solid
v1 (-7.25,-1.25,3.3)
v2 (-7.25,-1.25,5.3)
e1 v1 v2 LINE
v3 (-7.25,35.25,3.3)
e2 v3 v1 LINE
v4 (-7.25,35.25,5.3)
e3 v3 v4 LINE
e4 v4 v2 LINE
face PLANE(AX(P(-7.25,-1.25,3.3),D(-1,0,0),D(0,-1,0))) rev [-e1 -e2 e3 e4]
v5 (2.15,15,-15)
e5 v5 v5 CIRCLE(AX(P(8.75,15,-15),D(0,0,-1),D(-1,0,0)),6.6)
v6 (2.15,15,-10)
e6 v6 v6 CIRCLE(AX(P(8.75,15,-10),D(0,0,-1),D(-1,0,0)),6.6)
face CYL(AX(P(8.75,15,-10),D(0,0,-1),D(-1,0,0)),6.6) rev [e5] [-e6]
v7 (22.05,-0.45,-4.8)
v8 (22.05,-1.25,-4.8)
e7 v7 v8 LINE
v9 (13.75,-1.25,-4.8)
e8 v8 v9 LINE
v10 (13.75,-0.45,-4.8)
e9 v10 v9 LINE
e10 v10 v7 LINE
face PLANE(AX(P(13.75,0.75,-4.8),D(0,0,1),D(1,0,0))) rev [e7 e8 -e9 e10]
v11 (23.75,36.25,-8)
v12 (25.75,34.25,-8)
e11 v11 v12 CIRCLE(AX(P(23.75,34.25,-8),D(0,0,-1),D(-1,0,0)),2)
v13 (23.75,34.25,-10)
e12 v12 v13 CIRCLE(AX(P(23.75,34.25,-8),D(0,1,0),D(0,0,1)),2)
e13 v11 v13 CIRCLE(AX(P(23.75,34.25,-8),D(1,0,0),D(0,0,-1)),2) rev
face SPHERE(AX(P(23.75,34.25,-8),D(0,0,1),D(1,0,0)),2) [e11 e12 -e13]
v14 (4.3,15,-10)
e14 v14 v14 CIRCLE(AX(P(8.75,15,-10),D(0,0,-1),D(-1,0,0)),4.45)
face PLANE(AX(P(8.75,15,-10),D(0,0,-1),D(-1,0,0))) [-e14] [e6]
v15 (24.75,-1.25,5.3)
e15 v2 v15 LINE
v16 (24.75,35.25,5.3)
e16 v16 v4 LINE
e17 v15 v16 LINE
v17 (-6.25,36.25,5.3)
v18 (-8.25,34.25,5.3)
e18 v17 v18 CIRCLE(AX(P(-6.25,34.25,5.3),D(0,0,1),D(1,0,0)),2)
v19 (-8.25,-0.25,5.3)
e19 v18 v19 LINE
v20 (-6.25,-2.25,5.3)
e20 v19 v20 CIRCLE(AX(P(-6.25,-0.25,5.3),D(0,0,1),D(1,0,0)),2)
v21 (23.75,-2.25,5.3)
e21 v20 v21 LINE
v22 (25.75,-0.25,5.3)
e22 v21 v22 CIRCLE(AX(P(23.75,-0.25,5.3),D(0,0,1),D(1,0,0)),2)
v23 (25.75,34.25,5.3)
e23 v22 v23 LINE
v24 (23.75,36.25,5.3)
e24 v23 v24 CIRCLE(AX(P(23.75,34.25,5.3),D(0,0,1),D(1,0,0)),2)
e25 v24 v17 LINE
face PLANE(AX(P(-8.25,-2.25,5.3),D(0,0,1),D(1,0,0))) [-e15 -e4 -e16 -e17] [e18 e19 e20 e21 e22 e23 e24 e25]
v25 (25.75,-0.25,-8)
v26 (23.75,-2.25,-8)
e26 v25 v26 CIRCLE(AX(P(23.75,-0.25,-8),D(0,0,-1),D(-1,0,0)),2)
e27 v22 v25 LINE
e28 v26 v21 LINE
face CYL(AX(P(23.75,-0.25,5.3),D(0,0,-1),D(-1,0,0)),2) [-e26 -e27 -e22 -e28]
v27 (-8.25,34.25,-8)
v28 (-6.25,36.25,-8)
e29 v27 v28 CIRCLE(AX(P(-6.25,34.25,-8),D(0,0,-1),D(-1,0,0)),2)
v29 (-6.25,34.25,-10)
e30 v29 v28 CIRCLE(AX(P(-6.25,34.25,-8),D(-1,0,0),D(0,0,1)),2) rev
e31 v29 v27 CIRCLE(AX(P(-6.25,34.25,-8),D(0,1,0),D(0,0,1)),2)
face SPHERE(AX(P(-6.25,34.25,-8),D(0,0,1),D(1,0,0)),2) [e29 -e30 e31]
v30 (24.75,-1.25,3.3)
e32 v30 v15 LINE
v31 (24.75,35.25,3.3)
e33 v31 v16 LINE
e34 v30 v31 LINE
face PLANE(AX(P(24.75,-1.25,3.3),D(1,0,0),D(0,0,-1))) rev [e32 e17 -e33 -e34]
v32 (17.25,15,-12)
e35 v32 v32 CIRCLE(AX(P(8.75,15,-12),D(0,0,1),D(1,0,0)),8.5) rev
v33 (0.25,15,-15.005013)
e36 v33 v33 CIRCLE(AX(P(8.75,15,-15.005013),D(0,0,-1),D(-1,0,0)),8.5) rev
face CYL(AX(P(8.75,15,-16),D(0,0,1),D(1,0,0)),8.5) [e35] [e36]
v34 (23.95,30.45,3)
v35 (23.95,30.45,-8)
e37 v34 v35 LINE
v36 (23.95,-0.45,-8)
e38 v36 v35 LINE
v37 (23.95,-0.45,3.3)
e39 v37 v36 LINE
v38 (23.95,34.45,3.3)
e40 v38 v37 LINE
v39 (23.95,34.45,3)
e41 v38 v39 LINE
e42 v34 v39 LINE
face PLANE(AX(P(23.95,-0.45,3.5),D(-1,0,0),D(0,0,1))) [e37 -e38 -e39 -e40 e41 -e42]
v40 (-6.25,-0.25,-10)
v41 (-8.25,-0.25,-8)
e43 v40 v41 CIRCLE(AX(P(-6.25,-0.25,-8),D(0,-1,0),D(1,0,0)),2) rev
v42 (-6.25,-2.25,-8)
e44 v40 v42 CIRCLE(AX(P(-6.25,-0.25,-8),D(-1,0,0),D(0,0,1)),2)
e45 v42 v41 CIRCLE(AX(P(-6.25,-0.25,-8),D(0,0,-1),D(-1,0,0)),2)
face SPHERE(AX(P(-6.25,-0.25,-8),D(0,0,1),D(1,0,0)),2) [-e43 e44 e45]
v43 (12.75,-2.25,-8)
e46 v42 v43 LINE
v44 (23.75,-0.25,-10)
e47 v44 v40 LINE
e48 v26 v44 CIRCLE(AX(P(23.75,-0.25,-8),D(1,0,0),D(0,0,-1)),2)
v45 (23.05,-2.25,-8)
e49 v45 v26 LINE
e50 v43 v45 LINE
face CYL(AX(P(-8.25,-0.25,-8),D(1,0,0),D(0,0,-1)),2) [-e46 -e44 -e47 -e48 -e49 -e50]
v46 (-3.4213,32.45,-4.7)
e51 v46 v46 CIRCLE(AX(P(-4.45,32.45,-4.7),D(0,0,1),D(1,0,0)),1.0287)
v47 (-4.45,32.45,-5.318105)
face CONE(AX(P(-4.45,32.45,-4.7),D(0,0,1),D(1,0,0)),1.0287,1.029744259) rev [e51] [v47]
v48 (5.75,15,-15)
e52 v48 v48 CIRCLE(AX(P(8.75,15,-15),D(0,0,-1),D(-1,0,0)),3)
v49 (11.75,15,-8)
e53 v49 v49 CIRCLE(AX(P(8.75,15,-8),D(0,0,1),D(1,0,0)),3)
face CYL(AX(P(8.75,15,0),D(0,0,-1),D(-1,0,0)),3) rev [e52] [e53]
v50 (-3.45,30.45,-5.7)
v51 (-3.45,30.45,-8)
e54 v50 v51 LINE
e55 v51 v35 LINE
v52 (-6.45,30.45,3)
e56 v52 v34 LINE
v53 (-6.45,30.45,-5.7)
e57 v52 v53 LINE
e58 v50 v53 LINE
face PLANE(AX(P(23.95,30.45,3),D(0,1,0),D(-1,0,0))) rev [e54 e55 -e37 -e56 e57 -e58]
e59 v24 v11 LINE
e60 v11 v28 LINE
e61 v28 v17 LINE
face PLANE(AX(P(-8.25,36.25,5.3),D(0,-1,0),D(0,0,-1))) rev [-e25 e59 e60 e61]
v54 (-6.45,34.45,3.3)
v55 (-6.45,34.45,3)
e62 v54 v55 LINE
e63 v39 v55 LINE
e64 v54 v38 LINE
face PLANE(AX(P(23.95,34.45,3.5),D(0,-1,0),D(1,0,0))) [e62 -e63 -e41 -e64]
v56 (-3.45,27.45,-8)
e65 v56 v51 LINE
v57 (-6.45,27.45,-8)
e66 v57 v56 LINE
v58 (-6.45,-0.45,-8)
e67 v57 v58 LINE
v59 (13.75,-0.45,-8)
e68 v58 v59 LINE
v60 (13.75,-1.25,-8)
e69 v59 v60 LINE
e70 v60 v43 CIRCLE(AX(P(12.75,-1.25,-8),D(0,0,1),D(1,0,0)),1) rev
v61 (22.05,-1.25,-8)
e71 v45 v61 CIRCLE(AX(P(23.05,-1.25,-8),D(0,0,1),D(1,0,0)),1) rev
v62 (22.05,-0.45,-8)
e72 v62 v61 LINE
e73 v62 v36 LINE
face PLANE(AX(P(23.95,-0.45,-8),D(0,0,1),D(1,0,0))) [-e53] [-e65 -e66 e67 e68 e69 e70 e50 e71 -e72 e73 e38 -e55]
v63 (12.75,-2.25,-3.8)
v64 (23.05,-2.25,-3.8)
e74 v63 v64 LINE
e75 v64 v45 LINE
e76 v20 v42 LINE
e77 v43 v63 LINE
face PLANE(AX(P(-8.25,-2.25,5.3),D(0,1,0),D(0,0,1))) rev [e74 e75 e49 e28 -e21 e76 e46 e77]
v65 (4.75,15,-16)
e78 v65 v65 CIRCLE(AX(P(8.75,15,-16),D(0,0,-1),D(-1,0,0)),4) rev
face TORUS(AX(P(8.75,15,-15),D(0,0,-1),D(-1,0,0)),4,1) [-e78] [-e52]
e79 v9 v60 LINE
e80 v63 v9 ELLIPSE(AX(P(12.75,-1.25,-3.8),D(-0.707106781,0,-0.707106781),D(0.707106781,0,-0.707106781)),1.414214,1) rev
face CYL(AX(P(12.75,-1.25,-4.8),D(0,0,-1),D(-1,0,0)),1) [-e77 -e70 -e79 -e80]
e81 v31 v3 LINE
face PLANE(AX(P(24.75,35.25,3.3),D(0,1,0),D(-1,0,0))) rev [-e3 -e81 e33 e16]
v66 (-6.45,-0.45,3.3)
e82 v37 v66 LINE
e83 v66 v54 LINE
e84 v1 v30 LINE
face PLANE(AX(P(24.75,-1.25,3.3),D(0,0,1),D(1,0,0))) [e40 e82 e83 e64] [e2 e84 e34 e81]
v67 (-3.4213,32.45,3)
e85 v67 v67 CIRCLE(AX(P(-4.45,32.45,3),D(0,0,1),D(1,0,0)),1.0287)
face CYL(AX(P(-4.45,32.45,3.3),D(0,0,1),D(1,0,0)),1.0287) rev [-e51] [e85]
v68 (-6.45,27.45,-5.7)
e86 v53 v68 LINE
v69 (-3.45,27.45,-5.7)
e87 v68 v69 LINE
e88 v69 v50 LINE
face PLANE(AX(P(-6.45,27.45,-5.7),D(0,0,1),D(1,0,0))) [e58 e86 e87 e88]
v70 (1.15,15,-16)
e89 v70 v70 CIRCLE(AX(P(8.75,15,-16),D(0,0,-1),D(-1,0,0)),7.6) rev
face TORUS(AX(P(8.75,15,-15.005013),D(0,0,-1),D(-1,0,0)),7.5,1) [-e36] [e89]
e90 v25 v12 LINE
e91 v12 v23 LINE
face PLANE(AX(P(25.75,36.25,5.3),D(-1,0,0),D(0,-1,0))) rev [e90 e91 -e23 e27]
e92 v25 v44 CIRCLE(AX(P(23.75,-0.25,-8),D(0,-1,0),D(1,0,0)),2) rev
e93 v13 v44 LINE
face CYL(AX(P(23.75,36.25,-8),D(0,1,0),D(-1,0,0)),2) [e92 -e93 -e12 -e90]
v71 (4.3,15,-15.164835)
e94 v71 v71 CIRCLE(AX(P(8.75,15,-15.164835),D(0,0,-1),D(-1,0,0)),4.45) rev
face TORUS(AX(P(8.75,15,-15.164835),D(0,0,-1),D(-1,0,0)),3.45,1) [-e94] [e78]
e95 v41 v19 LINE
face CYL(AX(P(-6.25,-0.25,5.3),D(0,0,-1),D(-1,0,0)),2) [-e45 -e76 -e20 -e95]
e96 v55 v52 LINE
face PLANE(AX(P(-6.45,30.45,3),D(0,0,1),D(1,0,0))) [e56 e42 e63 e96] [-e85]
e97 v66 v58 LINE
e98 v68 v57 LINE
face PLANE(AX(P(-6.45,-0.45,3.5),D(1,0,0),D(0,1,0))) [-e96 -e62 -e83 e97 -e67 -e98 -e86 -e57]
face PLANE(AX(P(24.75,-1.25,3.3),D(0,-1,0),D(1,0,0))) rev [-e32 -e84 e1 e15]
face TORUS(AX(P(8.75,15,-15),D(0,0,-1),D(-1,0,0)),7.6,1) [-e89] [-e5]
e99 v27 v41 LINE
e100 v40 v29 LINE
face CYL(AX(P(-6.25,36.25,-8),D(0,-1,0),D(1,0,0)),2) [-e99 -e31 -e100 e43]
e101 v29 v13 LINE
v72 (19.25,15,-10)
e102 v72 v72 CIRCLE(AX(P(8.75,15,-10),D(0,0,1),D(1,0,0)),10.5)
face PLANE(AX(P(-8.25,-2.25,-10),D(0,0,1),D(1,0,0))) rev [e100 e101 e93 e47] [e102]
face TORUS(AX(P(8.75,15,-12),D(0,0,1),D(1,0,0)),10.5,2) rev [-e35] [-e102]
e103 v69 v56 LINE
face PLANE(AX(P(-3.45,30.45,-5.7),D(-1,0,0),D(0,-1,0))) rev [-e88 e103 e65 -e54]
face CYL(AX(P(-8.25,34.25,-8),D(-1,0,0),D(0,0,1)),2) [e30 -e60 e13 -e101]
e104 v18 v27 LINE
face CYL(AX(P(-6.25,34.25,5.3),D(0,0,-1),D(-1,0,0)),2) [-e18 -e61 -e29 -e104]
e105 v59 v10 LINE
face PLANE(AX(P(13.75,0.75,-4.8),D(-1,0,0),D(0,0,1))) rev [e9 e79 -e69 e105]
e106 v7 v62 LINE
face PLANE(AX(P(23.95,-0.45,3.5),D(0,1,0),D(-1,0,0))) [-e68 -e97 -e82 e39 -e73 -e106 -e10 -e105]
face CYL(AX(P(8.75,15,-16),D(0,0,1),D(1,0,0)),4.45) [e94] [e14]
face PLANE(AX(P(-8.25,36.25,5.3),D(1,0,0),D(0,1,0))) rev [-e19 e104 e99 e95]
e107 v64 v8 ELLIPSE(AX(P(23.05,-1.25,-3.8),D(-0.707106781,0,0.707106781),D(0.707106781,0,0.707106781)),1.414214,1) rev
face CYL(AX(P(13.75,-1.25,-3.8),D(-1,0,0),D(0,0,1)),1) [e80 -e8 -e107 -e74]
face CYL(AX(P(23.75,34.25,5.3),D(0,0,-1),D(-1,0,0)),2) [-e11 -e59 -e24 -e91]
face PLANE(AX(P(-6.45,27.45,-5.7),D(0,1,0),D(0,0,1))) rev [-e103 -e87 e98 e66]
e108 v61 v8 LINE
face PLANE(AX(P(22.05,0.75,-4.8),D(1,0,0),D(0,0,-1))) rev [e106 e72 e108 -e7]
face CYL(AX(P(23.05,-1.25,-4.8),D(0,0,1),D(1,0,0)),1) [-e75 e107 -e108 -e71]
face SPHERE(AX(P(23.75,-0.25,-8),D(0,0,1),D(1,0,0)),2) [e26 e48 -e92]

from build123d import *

# Parameters (mm, degrees)
EXTRUDE1_DEPTH            = 5.3
EXTRUDE1_DEPTH_BACK       = 10
SKETCH1_W                 = 34
SKETCH1_H                 = 38.5
SKETCH5_W                 = 32
SKETCH5_H                 = 36.5
CUT_EXTRUDE2_DEPTH        = 2
CUT_EXTRUDE3_DEPTH        = 0.2
CUT_EXTRUDE3_DEPTH_BACK   = 11.3
SKETCH6_W                 = 30.4
SKETCH6_H                 = 34.9
FILLET1_R                 = 2
SKETCH11_W                = 30.4
SKETCH11_H                = 4
EXTRUDE4_DEPTH            = 11
F_1_CLEARANCE_HOLE1_D     = 2.0574
F_1_CLEARANCE_HOLE1_DEPTH = 8
F_1_CLEARANCE_HOLE1_TIP   = 0.618105319
SKETCH17_R                = 3
CUT_EXTRUDE6_DEPTH        = 10
SKETCH18_W                = 3
SKETCH18_H                = 3
EXTRUDE5_DEPTH            = 2.3
SKETCH19_W                = 8.3
SKETCH19_H                = 3.2
CUT_EXTRUDE7_DEPTH        = 3
SKETCH20_R                = 8.5
EXTRUDE6_DEPTH            = 6
SKETCH21_R                = 6.6
CUT_EXTRUDE8_DEPTH        = 6
SKETCH22_R                = 4.45
EXTRUDE7_DEPTH            = 6
SKETCH23_R                = 3
CUT_EXTRUDE9_DEPTH        = 6
FILLET2_R                 = 1
FILLET3_R                 = 1
FILLET4_R                 = 1
FILLET5_R                 = 1
FILLET6_R                 = 2
FILLET7_R                 = 1


with BuildPart() as part:
    # Sketch1 → Extrude1 (new, two sides: drawn at the far end of the back side and taken through both)
    with BuildSketch(Plane.XY.offset(-EXTRUDE1_DEPTH_BACK)):
        with Locations((8.75, 17)):
            Rectangle(SKETCH1_W, SKETCH1_H)
    extrude(amount=EXTRUDE1_DEPTH + EXTRUDE1_DEPTH_BACK)

    # Sketch5 → Cut-Extrude2 (cut)
    with BuildSketch(Plane.XY.offset(5.3)):
        with Locations((8.75, 17)):
            Rectangle(SKETCH5_W, SKETCH5_H)
    extrude(amount=-CUT_EXTRUDE2_DEPTH, mode=Mode.SUBTRACT)

    # Sketch6 → Cut-Extrude3 (cut, two sides: drawn at the far end of the back side and taken through both)
    with BuildSketch(Plane.XY.offset(3.3).offset(-CUT_EXTRUDE3_DEPTH_BACK)):
        with Locations((8.75, 17)):
            Rectangle(SKETCH6_W, SKETCH6_H)
    extrude(amount=CUT_EXTRUDE3_DEPTH + CUT_EXTRUDE3_DEPTH_BACK, mode=Mode.SUBTRACT)

    # Fillet1
    fillet1_edges = [part.edges().sort_by_distance(p)[0] for p in [
        (-8.25, 17, -10),
        (8.75, 36.25, -10),
        (25.75, 17, -10),
        (8.75, -2.25, -10),
        (-8.25, 36.25, -2.35),
        (25.75, 36.25, -2.35),
        (25.75, -2.25, -2.35),
        (-8.25, -2.25, -2.35),
    ]]
    fillet(fillet1_edges, radius=FILLET1_R)

    # Sketch11 → Extrude4 (add)
    with BuildSketch(Plane.XY.offset(-8)):
        with Locations((8.75, 32.45)):
            Rectangle(SKETCH11_W, SKETCH11_H)
    extrude(amount=EXTRUDE4_DEPTH)

    # #1 Clearance Hole1
    with Locations(Plane.XY.offset(3.3)):
        with Locations((-4.45, 32.45)):
            Hole(F_1_CLEARANCE_HOLE1_D / 2, depth=F_1_CLEARANCE_HOLE1_DEPTH)
            with Locations((0, 0, -(F_1_CLEARANCE_HOLE1_DEPTH + F_1_CLEARANCE_HOLE1_TIP / 2))):  # 118° drill point
                Cone(0, F_1_CLEARANCE_HOLE1_D / 2, F_1_CLEARANCE_HOLE1_TIP, mode=Mode.SUBTRACT)

    # Sketch17 → Cut-Extrude6 (cut)
    with BuildSketch(Plane(origin=(0, 0, -10), x_dir=(-1, 0, 0), z_dir=(0, 0, -1))):
        with Locations((-8.75, 15)):
            Circle(SKETCH17_R)
    extrude(amount=-CUT_EXTRUDE6_DEPTH, mode=Mode.SUBTRACT)

    # Sketch18 → Extrude5 (add)
    with BuildSketch(Plane.XY.offset(-8)):
        with Locations((-4.95, 28.95)):
            Rectangle(SKETCH18_W, SKETCH18_H)
    extrude(amount=EXTRUDE5_DEPTH)

    # Sketch19 → Cut-Extrude7 (cut)
    with BuildSketch(Plane.XZ.offset(2.25)):
        with Locations((17.9, -6.4)):
            Rectangle(SKETCH19_W, SKETCH19_H)
    extrude(amount=-CUT_EXTRUDE7_DEPTH, mode=Mode.SUBTRACT)

    # Sketch20 → Extrude6 (add)
    with BuildSketch(Plane(origin=(0, 0, -10), x_dir=(-1, 0, 0), z_dir=(0, 0, -1))):
        with Locations(Location((-8.75, 15, 0), (0, 0, 180))):
            Circle(SKETCH20_R)
    extrude(amount=EXTRUDE6_DEPTH)

    # Sketch21 → Cut-Extrude8 (cut)
    with BuildSketch(Plane(origin=(0, 0, -16), x_dir=(-1, 0, 0), z_dir=(0, 0, -1))):
        with Locations((-8.75, 15)):
            Circle(SKETCH21_R)
    extrude(amount=-CUT_EXTRUDE8_DEPTH, mode=Mode.SUBTRACT)

    # Sketch22 → Extrude7 (add)
    with BuildSketch(Plane(origin=(0, 0, -10), x_dir=(-1, 0, 0), z_dir=(0, 0, -1))):
        with Locations((-8.75, 15)):
            Circle(SKETCH22_R)
    extrude(amount=EXTRUDE7_DEPTH)

    # Sketch23 → Cut-Extrude9 (cut)
    with BuildSketch(Plane(origin=(0, 0, -16), x_dir=(-1, 0, 0), z_dir=(0, 0, -1))):
        with Locations((-8.75, 15)):
            Circle(SKETCH23_R)
    extrude(amount=-CUT_EXTRUDE9_DEPTH, mode=Mode.SUBTRACT)

    # Fillet2
    fillet2_edges = [part.edges().sort_by_distance(p)[0] for p in [
        (15.35, 15, -16),
    ]]
    fillet(fillet2_edges, radius=FILLET2_R)

    # Fillet3
    # the kernel refuses this fillet: 1 mm, written as the material it takes off along each edge
    with BuildSketch(Plane(origin=(8.75, 15, -16), x_dir=(1, 0, 0), z_dir=(0, 1, 0))) as fillet3_piece_1:
        with BuildLine():
            CenterArc((7.5, -0.994987437), FILLET3_R, 0, 84.260829523)
            Line((8.5, -0.994987437), (8.52, -0.994987437))
            Line((8.52, -0.994987437), (8.52, 0))
            Line((8.52, 0), (8.5, 0.02))
            ThreePointArc((8.5, 0.02), (8.05, 0.02), (7.602, 0.019899749))
            Line((7.602, 0.019899749), (7.6, 0))
        make_face()
    revolve(axis=Axis((8.75, 15, -16), (0, 0, -1)), mode=Mode.SUBTRACT)

    # Fillet4
    fillet4_edges = [part.edges().sort_by_distance(p)[0] for p in [
        (11.75, 15, -16),
    ]]
    fillet(fillet4_edges, radius=FILLET4_R)

    # Fillet5
    # the kernel refuses this fillet: 1 mm, written as the material it takes off along each edge
    with BuildSketch(Plane(origin=(8.75, 15, -16), x_dir=(-1, 0, 0), z_dir=(0, -1, 0))) as fillet5_piece_1:
        with BuildLine():
            CenterArc((3.45, -0.835164654), FILLET5_R, 0, 56.632987031)
            Line((4.45, -0.835164654), (4.47, -0.835164654))
            Line((4.47, -0.835164654), (4.47, 0))
            Line((4.47, 0), (4.45, 0.02))
            ThreePointArc((4.45, 0.02), (4.225, 0.02), (4.011, 0.016703293))
            Line((4.011, 0.016703293), (4, 0))
        make_face()
    revolve(axis=Axis((8.75, 15, -16), (0, 0, -1)), mode=Mode.SUBTRACT)

    # Fillet6
    fillet6_edges = [part.edges().sort_by_distance(p)[0] for p in [
        (0.25, 15, -10),
    ]]
    fillet(fillet6_edges, radius=FILLET6_R)

    # Fillet7
    fillet7_edges = [part.edges().sort_by_distance(p)[0] for p in [
        (13.75, -2.25, -6.4),
        (22.05, -2.25, -6.4),
        (17.9, -2.25, -4.8),
    ]]
    fillet(fillet7_edges, radius=FILLET7_R)


solid = part.part
